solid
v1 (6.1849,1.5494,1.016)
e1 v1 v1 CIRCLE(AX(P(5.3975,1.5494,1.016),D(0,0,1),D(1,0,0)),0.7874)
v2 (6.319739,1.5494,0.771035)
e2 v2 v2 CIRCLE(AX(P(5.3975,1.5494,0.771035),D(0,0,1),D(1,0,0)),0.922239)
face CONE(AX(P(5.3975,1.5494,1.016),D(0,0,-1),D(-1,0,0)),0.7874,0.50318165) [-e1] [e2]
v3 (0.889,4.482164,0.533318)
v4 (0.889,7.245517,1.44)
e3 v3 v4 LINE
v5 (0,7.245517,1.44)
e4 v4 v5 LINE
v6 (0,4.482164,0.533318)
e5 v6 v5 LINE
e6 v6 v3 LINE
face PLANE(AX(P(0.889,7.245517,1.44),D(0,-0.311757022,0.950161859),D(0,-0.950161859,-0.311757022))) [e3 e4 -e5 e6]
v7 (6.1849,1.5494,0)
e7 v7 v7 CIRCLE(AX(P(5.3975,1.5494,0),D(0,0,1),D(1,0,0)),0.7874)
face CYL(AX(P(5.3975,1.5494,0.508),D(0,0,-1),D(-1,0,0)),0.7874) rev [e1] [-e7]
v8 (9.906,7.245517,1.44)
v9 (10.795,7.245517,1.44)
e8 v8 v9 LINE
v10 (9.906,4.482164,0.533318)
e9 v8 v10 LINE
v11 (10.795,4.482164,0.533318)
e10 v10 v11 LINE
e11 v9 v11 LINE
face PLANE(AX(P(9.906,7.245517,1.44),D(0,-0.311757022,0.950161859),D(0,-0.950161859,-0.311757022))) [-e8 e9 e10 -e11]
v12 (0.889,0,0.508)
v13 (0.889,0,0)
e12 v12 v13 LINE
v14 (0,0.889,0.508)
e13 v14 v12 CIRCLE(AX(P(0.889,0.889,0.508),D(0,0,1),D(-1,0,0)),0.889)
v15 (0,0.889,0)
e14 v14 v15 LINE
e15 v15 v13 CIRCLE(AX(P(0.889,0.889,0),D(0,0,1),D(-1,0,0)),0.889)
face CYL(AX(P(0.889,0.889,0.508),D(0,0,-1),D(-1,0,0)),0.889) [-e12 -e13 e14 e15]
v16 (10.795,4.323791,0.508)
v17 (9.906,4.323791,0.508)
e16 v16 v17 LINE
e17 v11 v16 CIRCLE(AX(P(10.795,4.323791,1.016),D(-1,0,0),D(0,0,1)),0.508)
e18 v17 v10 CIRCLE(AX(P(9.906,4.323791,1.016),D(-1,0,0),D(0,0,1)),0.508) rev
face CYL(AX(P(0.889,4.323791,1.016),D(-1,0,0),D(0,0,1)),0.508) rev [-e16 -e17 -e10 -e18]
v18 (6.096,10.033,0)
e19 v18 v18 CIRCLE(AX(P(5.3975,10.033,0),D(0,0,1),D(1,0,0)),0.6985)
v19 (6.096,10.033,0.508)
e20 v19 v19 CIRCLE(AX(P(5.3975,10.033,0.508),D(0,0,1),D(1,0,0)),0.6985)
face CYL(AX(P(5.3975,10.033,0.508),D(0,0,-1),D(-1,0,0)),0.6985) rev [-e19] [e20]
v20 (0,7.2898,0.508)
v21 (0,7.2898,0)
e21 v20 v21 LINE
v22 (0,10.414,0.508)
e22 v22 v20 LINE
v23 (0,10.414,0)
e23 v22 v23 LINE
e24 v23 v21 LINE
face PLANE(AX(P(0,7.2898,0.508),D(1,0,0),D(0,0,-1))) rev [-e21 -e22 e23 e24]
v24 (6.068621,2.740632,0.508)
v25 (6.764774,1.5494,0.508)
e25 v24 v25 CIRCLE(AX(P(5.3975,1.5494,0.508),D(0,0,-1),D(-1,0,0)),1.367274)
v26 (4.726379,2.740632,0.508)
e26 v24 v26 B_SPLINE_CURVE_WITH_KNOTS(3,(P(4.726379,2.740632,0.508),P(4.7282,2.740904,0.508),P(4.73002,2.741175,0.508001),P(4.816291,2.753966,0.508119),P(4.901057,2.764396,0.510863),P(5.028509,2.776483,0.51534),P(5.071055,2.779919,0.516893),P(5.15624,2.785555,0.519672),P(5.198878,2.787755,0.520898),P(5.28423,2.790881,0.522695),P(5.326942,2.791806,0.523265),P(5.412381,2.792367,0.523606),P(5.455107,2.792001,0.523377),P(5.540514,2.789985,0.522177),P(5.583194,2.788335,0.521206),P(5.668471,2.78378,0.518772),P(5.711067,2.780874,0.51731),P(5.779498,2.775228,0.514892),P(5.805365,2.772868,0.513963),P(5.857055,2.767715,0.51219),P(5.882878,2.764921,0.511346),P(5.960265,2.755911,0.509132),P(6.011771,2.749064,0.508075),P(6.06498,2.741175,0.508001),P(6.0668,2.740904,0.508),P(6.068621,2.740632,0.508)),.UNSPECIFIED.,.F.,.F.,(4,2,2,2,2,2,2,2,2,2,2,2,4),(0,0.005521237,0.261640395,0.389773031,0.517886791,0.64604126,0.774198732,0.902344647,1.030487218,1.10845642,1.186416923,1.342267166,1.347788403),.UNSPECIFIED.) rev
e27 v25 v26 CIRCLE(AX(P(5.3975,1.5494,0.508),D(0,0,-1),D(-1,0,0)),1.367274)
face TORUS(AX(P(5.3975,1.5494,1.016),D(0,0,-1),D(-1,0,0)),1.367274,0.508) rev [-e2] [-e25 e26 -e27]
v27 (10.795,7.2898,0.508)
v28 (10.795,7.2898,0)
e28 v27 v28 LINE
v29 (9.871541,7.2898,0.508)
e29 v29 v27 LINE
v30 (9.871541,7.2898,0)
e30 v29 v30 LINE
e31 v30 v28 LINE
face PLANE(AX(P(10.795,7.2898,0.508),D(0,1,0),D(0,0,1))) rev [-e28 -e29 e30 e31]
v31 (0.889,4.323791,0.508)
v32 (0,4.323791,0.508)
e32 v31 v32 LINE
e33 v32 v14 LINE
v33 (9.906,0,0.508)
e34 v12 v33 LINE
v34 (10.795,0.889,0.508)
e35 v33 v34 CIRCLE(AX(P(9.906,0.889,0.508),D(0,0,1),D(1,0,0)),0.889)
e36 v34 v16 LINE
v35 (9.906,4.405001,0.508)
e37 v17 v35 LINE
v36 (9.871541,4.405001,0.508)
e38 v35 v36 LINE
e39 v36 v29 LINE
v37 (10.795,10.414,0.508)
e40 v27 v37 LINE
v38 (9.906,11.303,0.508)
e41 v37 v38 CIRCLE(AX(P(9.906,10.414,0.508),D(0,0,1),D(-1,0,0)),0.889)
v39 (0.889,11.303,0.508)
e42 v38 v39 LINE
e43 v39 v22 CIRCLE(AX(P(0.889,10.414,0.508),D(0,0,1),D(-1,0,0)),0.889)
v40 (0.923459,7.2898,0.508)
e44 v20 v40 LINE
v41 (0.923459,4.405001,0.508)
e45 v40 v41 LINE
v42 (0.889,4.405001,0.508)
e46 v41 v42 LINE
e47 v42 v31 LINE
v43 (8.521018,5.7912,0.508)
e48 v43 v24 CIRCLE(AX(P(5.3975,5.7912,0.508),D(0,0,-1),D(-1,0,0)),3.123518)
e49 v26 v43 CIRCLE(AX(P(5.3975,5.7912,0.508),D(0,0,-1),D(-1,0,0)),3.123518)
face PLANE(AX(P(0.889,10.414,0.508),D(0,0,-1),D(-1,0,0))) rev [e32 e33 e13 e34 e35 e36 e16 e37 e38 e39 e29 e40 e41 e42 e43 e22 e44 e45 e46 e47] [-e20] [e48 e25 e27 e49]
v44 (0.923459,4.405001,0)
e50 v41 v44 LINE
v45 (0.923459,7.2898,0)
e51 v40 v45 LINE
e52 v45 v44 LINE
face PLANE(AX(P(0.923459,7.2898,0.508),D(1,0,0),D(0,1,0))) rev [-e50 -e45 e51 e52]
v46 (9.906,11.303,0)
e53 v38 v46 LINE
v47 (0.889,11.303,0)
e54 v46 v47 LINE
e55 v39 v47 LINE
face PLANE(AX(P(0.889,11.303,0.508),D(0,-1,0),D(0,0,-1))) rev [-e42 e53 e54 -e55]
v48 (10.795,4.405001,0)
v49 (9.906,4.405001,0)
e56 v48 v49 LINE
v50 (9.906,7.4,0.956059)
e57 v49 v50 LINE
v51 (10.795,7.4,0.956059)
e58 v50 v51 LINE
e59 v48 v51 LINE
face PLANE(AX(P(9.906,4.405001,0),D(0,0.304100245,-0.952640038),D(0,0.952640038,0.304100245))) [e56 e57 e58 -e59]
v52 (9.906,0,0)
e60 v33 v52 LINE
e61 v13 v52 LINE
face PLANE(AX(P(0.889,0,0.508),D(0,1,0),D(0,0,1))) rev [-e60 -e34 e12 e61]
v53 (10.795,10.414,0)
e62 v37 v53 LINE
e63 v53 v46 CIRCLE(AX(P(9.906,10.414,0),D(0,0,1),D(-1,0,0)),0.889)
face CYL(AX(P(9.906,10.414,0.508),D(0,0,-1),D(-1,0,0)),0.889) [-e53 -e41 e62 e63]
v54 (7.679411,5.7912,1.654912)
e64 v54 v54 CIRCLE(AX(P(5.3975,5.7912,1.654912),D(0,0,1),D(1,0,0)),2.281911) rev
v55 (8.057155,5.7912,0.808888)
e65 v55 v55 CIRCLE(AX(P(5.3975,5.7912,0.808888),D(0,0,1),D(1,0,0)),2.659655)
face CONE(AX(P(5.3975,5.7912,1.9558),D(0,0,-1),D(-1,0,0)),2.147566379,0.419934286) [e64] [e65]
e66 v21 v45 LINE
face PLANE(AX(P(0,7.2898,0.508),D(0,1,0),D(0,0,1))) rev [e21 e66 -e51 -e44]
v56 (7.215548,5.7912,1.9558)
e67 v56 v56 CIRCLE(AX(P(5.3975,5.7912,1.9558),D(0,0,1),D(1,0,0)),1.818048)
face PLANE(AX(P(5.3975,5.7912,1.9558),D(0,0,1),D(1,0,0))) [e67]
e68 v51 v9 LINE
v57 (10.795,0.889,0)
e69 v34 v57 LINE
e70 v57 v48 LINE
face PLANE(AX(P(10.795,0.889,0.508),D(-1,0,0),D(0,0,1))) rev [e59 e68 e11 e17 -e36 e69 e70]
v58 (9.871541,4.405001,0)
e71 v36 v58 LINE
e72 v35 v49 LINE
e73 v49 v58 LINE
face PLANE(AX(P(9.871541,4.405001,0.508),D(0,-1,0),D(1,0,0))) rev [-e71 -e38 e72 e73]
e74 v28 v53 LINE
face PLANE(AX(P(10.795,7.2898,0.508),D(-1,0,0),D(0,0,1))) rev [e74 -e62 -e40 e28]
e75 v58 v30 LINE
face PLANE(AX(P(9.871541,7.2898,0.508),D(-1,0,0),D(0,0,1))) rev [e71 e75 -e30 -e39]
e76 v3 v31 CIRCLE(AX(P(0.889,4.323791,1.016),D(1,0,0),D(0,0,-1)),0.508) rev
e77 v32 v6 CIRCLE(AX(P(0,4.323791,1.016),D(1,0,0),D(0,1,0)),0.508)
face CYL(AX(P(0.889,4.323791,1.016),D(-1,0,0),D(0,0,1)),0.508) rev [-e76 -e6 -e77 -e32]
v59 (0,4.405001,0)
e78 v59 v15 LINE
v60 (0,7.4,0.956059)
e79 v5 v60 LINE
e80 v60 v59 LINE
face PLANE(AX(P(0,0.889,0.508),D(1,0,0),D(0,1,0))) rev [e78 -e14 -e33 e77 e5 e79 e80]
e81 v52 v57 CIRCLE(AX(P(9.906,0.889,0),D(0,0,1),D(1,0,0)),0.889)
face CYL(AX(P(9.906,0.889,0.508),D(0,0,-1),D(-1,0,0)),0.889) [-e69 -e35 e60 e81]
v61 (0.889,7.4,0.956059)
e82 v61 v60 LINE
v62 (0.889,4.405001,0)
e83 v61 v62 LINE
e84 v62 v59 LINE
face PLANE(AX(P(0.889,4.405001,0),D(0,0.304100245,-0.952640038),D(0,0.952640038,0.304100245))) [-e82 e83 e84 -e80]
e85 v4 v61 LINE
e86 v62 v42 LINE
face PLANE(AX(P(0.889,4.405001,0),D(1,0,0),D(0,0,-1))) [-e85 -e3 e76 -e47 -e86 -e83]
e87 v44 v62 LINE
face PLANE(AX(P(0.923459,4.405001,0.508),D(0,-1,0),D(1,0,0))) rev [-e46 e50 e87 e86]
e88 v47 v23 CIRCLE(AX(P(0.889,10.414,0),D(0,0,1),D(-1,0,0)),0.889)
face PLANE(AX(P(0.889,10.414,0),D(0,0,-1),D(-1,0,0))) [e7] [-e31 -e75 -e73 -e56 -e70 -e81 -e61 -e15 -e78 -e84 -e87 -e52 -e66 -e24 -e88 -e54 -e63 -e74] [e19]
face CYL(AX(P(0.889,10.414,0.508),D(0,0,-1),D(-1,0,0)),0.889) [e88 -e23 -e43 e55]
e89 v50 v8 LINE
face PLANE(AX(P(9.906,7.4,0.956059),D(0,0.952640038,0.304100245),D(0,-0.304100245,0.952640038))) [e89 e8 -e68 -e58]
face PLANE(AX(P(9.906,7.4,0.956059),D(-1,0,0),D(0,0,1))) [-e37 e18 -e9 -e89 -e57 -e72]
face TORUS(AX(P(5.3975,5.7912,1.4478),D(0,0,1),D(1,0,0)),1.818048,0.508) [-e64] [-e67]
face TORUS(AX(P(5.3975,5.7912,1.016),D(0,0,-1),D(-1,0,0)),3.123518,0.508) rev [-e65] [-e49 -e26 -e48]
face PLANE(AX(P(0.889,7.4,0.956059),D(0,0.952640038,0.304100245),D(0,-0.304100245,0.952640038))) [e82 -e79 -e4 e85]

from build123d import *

# Parameters (mm, degrees)
SKETCH1_R           = 0.6985
SKETCH1_R_2         = 0.7874
BOSS_EXTRUDE1_DEPTH = 0.508
SKETCH3_R           = 2.794
SKETCH4_R           = 2.147566379
SKETCH5_R           = 1.067023976
SKETCH6_R           = 0.7874
CUT_EXTRUDE1_START  = -0.508
SKETCH7_R           = 0.7874
CUT_EXTRUDE1_DEPTH  = 0.508
BOSS_EXTRUDE2_DEPTH = 0.889
BOSS_EXTRUDE3_DEPTH = 0.889
FILLET1_R           = 0.508


with BuildPart() as part:
    # Sketch1 → Boss-Extrude1 (new body)
    with BuildSketch(Plane.XY):
        with BuildLine():
            Line((0.889, 0), (9.906, 0))
            ThreePointArc((9.906, 0), (10.534617928, 0.260382072), (10.795, 0.889))
            Line((10.795, 0.889), (10.795, 4.405000935))
            Line((10.795, 4.405000935), (9.871541288, 4.405000935))
            Line((9.871541288, 4.405000935), (9.871541288, 7.2898))
            Line((9.871541288, 7.2898), (10.795, 7.2898))
            Line((10.795, 7.2898), (10.795, 10.414))
            ThreePointArc((10.795, 10.414), (10.534617928, 11.042617928), (9.906, 11.303))
            Line((9.906, 11.303), (0.889, 11.303))
            ThreePointArc((0.889, 11.303), (0.260382072, 11.042617928), (0, 10.414))
            Line((0, 10.414), (0, 7.2898))
            Line((0, 7.2898), (0.923458712, 7.2898))
            Line((0.923458712, 7.2898), (0.923458712, 4.405000935))
            Line((0.923458712, 4.405000935), (0, 4.405000935))
            Line((0, 4.405000935), (0, 0.889))
            ThreePointArc((0, 0.889), (0.260382072, 0.260382072), (0.889, 0))
        make_face()
        with Locations((5.3975, 10.033)):
            Circle(SKETCH1_R, mode=Mode.SUBTRACT)
        with Locations((5.3975, 1.5494)):
            Circle(SKETCH1_R_2, mode=Mode.SUBTRACT)
    extrude(amount=BOSS_EXTRUDE1_DEPTH)

    # Sketch3 → Loft1 section 0
    with BuildSketch(Plane.XY.offset(0.508)):
        with Locations((5.3975, 5.7912)):
            Circle(SKETCH3_R)
    # Sketch4 → Loft1 section 1
    with BuildSketch(Plane.XY.offset(1.9558)):
        with Locations((5.3975, 5.7912)):
            Circle(SKETCH4_R)
    loft()

    # Sketch5 → Loft2 section 0
    with BuildSketch(Plane.XY.offset(0.508)):
        with Locations((5.3975, 1.5494)):
            Circle(SKETCH5_R)
    # Sketch6 → Loft2 section 1
    with BuildSketch(Plane.XY.offset(1.016)):
        with Locations((5.3975, 1.5494)):
            Circle(SKETCH6_R)
    loft()

    # Sketch7 → Cut-Extrude1 (cut)
    with BuildSketch(Plane.XY.offset(1.016).offset(CUT_EXTRUDE1_START)):
        with Locations((5.3975, 1.5494)):
            Circle(SKETCH7_R)
    extrude(amount=CUT_EXTRUDE1_DEPTH, mode=Mode.SUBTRACT)

    # Sketch9 → Boss-Extrude2 (add)
    with BuildSketch(Plane.ZY):
        Polygon((0, 4.405000935), (0.956058861, 7.4), (1.44, 7.245517076), (0.508, 4.405000935), align=None)
    extrude(amount=-BOSS_EXTRUDE2_DEPTH)

    # Sketch10 → Boss-Extrude3 (add)
    with BuildSketch(Plane(origin=(10.795, 0, 0), x_dir=(0, 0, -1), z_dir=(1, 0, 0))):
        Polygon((-1.44, 7.245517076), (-0.508, 4.405000935), (0, 4.405000935), (-0.956058861, 7.4), align=None)
    extrude(amount=-BOSS_EXTRUDE3_DEPTH)

    # Fillet1
    # the kernel refuses this fillet: 0.508 mm, written as the material it adds along each edge
    with BuildSketch(Plane(origin=(10.795, 4.405000935, 0.508), x_dir=(0, -1, 0), z_dir=(-1, 0, 0)), Plane(origin=(0.889, 4.405000935, 0.508), x_dir=(0, -1, 0), z_dir=(-1, 0, 0))) as fillet1_piece_1:
        with BuildLine():
            CenterArc((FILLET1_R * 0.159862126559, FILLET1_R), FILLET1_R, 251.83485126, 18.16514874)
            Line((-FILLET1_R * 0.151894895434, FILLET1_R * 0.0498381405053), (0, 0))
            Line((0, 0), (FILLET1_R * 0.159862126559, 0))
        make_face()
    extrude(amount=0.889)
    with BuildSketch(Plane(origin=(5.3975, 5.7912, 0.508), x_dir=(1, 0, 0), z_dir=(0, -1, 0))) as fillet1_piece_2:
        with BuildLine():
            CenterArc((2.794 + FILLET1_R * 0.648657698793, FILLET1_R), FILLET1_R, 204.060462248, 65.939537752)
            Line((2.794 - FILLET1_R * 0.264458035208, FILLET1_R * 0.592299550749), (2.794, 0))
            Line((2.794, 0), (2.794 + FILLET1_R * 0.648657698793, 0))
        make_face()
    revolve(axis=Axis((5.3975, 5.7912, 0.508), (0, 0, 1)))
    with BuildSketch(Plane(origin=(5.3975, 1.5494, 0.508), x_dir=(1, 0, 0), z_dir=(0, -1, 0))) as fillet1_piece_3:
        with BuildLine():
            CenterArc((1.067023976 + FILLET1_R * 0.591042865148, FILLET1_R), FILLET1_R, 208.830184855, 61.169815145)
            Line((1.067023976 - FILLET1_R * 0.285009893371, FILLET1_R * 0.517784732415), (1.067023976, 0))
            Line((1.067023976, 0), (1.067023976 + FILLET1_R * 0.591042865148, 0))
        make_face()
    revolve(axis=Axis((5.3975, 1.5494, 0.508), (0, 0, 1)))
    # the kernel refuses this fillet: 0.508 mm, written as the material it takes off along each edge
    with BuildSketch(Plane(origin=(5.3975, 5.7912, 1.9558), x_dir=(1, 0, 0), z_dir=(0, -1, 0))) as fillet1_2_piece_1:
        with BuildLine():
            CenterArc((2.147566379 - FILLET1_R * 0.648657698793, -FILLET1_R), FILLET1_R, 24.060462248, 65.939537752)
            Line((2.147566379 - FILLET1_R * 0.648657698793, 0), (2.147566379, 0))
            Line((2.147566379, 0), (2.147566379 + FILLET1_R * 0.264458035208, -FILLET1_R * 0.592299550749))
        make_face()
    revolve(axis=Axis((5.3975, 5.7912, 1.9558), (0, 0, 1)), mode=Mode.SUBTRACT)


solid = part.part
